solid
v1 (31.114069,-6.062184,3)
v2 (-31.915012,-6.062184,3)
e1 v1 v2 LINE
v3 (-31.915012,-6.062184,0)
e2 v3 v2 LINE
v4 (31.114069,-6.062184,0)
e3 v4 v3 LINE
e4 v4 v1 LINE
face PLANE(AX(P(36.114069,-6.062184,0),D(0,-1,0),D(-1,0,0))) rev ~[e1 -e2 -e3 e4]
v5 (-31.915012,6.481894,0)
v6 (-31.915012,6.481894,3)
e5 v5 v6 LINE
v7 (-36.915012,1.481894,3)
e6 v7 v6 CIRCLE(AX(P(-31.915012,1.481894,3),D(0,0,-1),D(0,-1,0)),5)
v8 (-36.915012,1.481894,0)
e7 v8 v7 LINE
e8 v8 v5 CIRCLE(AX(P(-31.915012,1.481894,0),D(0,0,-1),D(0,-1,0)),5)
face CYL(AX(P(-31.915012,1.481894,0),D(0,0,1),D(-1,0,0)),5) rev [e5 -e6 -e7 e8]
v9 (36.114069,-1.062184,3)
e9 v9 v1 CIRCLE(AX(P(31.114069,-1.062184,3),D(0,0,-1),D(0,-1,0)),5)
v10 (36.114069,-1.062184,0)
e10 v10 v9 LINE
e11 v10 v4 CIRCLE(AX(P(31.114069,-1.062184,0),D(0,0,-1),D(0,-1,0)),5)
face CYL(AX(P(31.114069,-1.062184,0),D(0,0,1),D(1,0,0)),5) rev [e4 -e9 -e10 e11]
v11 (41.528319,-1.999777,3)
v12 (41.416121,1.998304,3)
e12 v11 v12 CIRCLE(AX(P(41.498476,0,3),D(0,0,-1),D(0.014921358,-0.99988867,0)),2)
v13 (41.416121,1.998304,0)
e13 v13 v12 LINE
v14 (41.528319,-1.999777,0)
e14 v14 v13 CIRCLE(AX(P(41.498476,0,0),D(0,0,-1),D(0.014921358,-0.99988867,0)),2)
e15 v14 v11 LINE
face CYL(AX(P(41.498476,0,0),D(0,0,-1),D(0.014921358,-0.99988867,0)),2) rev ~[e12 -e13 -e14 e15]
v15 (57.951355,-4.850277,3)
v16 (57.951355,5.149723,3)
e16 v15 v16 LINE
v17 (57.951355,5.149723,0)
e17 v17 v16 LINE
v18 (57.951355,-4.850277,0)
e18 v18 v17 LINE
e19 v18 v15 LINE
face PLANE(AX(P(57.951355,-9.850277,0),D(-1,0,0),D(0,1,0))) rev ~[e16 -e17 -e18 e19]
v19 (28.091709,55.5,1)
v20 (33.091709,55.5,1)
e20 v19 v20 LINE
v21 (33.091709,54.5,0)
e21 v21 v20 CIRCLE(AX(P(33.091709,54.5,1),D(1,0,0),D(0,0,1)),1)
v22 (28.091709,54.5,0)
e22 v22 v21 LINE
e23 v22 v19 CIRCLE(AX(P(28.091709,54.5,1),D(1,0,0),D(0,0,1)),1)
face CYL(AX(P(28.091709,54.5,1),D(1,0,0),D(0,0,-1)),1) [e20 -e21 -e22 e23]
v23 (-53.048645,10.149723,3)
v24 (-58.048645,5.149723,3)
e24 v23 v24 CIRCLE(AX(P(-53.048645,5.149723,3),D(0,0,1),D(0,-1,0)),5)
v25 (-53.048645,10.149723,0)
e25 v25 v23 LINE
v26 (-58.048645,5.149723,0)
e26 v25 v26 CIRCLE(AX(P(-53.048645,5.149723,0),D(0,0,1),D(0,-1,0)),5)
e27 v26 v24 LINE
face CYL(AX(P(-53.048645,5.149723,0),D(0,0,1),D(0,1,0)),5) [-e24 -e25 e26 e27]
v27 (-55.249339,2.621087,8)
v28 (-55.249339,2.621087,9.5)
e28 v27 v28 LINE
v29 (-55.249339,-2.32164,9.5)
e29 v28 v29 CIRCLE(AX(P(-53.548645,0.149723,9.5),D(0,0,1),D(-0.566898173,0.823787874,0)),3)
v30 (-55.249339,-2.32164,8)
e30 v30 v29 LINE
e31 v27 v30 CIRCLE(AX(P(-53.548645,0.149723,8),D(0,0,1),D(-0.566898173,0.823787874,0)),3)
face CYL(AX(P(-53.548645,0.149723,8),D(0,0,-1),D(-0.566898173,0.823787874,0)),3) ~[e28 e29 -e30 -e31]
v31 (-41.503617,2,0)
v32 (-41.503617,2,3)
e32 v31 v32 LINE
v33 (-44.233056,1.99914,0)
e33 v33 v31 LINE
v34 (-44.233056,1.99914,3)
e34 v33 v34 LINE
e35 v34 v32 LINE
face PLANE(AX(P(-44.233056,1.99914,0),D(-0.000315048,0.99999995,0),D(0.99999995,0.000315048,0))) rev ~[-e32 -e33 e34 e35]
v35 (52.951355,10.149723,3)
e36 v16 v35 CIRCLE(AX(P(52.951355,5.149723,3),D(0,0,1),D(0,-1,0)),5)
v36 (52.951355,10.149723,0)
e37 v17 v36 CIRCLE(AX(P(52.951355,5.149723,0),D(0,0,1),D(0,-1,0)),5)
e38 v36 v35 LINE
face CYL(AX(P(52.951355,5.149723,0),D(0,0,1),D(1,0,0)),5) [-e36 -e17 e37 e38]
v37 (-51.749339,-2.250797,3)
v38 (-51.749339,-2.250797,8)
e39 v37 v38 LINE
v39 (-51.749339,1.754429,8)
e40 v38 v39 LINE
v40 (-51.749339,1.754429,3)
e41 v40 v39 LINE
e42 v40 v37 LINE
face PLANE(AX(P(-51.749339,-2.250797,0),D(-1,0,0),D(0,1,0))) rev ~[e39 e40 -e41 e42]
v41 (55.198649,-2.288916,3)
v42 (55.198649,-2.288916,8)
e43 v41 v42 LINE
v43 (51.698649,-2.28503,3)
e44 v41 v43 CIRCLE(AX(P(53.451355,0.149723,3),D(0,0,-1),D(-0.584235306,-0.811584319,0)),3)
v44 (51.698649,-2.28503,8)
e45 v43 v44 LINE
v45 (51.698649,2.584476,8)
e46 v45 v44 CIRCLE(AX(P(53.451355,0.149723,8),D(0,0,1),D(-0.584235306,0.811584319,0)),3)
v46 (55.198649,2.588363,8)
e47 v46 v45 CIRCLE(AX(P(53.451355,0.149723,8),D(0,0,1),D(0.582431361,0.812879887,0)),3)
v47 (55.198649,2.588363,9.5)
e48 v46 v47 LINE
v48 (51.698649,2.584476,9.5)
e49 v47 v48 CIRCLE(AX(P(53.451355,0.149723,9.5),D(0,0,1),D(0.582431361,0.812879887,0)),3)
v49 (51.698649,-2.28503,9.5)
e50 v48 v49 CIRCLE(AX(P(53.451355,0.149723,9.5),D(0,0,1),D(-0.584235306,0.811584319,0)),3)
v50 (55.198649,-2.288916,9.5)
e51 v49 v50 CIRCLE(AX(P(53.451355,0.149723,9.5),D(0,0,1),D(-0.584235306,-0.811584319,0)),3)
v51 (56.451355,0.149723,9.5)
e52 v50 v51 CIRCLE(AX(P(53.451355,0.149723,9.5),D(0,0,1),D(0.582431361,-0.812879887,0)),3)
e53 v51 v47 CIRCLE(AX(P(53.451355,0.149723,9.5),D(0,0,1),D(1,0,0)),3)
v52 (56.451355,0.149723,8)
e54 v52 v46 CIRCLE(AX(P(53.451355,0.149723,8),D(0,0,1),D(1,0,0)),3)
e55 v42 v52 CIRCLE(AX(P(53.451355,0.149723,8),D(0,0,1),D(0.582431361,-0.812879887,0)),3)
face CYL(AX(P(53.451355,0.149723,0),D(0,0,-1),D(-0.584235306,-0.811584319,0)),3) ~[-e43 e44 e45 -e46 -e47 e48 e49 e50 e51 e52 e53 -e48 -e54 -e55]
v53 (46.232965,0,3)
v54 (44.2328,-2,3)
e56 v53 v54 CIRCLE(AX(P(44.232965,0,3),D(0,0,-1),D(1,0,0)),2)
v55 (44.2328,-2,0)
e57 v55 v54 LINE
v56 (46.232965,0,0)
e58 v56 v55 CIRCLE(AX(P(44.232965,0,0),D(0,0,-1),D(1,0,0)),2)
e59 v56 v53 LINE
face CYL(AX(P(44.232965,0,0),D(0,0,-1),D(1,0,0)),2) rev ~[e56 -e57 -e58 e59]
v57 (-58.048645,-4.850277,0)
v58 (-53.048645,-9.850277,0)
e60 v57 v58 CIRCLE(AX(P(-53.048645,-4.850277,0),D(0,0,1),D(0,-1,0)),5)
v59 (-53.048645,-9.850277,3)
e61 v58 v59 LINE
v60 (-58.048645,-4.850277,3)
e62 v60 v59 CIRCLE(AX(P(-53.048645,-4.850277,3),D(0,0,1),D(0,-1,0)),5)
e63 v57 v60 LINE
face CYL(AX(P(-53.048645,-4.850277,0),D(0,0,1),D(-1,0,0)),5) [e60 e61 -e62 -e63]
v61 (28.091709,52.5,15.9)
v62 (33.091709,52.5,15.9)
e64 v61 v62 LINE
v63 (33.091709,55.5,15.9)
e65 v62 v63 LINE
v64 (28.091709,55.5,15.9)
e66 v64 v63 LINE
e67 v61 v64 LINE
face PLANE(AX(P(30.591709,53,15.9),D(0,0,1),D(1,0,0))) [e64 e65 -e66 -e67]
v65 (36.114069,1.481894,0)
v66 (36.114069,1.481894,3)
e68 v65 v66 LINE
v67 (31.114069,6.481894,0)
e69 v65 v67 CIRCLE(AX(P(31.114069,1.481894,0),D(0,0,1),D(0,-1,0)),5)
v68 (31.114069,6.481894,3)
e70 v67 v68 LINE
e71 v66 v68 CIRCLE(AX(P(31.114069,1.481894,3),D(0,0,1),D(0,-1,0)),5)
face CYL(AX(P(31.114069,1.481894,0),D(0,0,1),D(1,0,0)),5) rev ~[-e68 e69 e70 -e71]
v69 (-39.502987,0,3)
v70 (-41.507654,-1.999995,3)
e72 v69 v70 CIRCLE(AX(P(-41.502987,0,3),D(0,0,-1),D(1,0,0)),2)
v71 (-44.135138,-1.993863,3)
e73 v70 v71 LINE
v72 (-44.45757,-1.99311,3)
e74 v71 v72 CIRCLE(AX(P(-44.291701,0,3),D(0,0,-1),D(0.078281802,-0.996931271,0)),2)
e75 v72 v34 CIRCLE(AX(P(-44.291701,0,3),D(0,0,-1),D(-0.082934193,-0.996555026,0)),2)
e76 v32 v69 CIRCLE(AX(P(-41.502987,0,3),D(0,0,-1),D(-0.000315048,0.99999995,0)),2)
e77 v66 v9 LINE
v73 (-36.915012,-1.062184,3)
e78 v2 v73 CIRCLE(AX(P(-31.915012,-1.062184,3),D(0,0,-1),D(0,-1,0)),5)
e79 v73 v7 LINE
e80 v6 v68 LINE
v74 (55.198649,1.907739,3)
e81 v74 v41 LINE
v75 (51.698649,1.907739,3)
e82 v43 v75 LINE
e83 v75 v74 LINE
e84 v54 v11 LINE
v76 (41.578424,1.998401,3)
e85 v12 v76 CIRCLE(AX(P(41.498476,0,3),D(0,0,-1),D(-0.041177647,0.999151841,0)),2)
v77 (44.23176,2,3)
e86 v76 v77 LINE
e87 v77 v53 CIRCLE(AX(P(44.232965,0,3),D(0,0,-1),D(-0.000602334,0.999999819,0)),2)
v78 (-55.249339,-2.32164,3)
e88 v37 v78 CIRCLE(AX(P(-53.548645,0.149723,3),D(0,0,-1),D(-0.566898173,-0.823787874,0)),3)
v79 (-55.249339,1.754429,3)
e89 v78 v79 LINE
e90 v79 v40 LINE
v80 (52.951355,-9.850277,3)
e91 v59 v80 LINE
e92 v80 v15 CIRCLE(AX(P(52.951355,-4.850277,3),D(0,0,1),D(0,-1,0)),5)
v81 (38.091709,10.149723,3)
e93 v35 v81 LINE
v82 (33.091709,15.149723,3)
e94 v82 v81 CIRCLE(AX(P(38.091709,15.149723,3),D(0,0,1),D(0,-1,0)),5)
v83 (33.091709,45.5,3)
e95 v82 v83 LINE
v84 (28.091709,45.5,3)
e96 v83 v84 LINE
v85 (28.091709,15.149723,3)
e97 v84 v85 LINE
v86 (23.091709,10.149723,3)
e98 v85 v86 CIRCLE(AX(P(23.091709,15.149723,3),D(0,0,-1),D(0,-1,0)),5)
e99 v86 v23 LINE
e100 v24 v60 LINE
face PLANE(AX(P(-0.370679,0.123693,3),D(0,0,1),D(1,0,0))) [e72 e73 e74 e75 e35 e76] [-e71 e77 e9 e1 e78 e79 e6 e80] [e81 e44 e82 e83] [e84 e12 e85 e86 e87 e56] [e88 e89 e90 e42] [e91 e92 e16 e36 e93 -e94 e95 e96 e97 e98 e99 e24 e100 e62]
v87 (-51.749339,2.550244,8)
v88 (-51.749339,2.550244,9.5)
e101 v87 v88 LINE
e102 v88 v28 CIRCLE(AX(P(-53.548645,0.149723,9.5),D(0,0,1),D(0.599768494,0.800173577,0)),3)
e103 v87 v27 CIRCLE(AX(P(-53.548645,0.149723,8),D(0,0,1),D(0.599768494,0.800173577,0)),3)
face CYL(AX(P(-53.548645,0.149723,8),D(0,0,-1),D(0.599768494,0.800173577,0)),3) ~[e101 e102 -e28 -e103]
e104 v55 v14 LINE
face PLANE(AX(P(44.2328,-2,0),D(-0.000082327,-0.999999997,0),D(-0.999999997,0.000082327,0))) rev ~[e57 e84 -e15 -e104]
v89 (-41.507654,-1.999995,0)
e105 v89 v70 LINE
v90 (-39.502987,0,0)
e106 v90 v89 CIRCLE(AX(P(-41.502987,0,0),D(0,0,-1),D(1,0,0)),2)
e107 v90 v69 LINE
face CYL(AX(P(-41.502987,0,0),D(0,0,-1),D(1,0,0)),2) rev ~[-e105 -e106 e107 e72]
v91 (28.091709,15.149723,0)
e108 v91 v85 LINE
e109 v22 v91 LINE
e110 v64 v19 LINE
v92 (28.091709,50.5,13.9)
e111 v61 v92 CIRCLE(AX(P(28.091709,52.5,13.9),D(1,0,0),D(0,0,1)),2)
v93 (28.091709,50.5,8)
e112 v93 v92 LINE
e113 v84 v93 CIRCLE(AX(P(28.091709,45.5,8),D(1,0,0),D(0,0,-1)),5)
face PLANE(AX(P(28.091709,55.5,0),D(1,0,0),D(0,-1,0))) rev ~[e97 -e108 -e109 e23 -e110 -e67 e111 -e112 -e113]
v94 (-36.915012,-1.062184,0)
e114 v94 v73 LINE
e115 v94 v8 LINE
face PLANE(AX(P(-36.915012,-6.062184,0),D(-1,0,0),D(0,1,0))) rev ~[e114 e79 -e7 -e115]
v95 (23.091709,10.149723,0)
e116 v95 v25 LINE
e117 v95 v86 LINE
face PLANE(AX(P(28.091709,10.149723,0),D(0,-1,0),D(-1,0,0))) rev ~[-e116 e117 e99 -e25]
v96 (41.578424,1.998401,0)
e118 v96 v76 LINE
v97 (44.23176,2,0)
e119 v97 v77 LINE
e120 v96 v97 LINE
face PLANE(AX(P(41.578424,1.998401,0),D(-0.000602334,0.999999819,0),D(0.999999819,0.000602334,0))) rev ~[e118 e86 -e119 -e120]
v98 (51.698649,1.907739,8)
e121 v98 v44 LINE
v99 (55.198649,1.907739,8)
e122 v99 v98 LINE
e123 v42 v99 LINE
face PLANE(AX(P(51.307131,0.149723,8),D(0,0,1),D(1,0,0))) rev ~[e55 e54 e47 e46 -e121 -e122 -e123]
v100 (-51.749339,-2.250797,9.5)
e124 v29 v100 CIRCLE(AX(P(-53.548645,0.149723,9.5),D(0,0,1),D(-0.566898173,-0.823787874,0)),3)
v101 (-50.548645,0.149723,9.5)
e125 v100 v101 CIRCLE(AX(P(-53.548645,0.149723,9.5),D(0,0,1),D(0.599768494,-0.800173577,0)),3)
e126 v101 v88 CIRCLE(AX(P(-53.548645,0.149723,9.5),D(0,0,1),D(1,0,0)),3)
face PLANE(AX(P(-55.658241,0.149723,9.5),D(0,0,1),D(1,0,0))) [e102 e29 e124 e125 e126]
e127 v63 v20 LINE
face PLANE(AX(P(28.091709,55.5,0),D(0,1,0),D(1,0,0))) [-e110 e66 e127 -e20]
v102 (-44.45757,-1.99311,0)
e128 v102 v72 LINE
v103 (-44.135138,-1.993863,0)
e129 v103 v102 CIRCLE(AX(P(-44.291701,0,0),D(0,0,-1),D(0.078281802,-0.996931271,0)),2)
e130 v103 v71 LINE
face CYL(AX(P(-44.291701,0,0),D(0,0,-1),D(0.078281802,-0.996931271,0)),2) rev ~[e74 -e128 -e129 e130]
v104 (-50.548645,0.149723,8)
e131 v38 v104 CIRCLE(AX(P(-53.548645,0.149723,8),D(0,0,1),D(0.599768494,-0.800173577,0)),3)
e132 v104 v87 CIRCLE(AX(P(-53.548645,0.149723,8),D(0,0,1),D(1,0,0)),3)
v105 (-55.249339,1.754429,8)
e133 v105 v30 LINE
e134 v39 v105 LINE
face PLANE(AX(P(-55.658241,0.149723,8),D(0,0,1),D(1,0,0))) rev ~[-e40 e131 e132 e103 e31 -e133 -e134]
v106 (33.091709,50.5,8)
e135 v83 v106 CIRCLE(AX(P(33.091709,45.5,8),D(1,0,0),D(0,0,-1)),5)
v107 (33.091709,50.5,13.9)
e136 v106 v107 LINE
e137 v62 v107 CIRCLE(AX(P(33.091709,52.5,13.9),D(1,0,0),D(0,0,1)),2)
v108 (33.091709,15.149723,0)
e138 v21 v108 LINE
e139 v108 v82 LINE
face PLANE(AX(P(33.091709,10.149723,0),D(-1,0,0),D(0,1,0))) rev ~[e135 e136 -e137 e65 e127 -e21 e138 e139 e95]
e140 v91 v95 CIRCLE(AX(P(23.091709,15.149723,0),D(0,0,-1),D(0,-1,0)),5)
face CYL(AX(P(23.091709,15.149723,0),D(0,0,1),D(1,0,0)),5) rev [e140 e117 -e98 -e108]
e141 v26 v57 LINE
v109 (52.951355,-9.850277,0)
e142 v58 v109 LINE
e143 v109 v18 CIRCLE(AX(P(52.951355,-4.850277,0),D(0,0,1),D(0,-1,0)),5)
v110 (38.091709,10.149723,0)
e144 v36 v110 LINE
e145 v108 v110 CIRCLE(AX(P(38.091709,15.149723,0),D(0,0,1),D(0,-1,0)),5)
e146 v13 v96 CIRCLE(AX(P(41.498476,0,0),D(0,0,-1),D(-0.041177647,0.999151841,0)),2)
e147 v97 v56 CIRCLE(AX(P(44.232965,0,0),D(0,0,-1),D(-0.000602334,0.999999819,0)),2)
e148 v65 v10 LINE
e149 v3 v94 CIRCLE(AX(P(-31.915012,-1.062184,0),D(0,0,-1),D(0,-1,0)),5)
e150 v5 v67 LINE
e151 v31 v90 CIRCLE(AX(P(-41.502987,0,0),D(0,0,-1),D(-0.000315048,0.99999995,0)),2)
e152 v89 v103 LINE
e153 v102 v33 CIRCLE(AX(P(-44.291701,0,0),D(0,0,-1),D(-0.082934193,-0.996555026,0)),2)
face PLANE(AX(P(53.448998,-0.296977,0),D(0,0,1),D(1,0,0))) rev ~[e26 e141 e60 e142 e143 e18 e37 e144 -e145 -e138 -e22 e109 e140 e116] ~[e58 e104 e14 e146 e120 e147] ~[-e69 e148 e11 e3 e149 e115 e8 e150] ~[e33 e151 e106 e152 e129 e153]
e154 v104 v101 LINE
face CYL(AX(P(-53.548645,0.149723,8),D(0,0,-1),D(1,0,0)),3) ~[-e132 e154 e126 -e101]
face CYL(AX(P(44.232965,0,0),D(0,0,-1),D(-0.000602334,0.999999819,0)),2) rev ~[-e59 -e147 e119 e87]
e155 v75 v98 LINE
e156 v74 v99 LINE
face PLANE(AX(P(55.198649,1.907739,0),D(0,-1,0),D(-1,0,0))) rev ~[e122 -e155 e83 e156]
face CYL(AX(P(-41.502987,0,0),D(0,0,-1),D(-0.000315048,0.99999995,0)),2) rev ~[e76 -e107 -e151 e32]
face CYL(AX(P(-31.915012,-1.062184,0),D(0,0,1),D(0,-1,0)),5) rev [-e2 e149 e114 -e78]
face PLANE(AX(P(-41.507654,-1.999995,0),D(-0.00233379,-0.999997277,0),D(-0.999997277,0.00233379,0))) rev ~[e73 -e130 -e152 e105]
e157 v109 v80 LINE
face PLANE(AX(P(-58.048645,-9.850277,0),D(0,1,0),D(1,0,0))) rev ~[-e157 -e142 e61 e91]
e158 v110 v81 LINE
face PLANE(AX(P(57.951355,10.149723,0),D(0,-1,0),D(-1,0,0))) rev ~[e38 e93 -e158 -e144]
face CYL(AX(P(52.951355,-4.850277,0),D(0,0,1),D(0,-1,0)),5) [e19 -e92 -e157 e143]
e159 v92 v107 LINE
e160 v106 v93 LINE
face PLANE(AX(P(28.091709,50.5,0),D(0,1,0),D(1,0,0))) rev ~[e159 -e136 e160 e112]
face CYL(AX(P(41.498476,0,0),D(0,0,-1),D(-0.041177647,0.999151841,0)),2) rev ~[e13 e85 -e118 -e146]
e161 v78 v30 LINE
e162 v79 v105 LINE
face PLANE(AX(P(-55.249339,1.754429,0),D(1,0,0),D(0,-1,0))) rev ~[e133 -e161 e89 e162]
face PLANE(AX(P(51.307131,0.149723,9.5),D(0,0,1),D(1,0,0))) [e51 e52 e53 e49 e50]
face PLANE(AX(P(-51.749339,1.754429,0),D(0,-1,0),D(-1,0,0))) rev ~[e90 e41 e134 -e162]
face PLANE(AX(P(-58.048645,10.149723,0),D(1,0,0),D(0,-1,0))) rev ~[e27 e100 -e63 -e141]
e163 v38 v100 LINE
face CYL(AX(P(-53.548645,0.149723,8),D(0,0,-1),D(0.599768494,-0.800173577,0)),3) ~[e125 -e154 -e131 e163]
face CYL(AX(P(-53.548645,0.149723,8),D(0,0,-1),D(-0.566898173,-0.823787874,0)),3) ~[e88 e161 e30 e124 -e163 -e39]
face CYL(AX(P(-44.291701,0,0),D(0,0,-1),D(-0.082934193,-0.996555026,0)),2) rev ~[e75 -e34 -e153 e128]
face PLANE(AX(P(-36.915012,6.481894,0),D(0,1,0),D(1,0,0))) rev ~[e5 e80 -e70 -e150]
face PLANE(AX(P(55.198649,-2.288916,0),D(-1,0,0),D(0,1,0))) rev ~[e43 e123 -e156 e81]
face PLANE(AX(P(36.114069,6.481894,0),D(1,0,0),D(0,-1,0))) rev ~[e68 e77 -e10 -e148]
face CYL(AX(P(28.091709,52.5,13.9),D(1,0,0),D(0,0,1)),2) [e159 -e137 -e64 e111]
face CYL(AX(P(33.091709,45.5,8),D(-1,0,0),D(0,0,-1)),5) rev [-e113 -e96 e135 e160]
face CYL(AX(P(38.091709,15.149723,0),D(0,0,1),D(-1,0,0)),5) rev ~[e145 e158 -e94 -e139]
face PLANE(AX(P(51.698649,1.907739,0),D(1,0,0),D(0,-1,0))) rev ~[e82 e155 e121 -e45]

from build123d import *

# Parameters (mm, degrees)
F0_W     = 5
F0_H     = 40.3502766341
F0_H_2   = 5
F0_H_3   = 3.6678295396
F1_DEPTH = 3
F2_DEPTH = 8
F3_START = 8
F3_DEPTH = 1.5
F4_DEPTH = 15.9
F5_R     = 5
F6_R     = 2
F7_R     = 5
F8_R     = 5
F9_R     = 1


# Not quite as in the source:
# - a feature names something its author has since deleted; it is built from what else it names


with BuildPart() as f1:
    # F0 (on Top) → F1 (new body)
    with BuildSketch(Plane.XY):
        Polygon((28.0917086639, 10.1497233659), (-58.0486447513, 10.1497233659), (-58.0486447513, -9.8502766341), (57.9513552487, -9.8502766341), (57.9513552487, 10.1497233659), (33.0917086639, 10.1497233659), (33.0917086639, 6.4818938263), (36.1140687019, 6.4818938263), (36.1140687019, -6.0621835291), (-36.915011704, -6.0621835291), (-36.915011704, 6.4818938263), (28.0917086639, 6.4818938263), align=None)
        with BuildLine():
            ThreePointArc((-51.749339269, 2.5502440972), (-50.8655573089, 1.4917523434), (-50.5486447513, 0.1497233659))
            ThreePointArc((-50.5486447513, 0.1497233659), (-50.8655573089, -1.1923056116), (-51.749339269, -2.2507973654))
            ThreePointArc((-51.749339269, -2.2507973654), (-53.4879347075, -2.8496622863), (-55.249339269, -2.3216402572))
            ThreePointArc((-55.249339269, -2.3216402572), (-56.5486447513, 0.1497233659), (-55.249339269, 2.621086989))
            ThreePointArc((-55.249339269, 2.621086989), (-53.4879347075, 3.1491090181), (-51.749339269, 2.5502440972))
        make_face(mode=Mode.SUBTRACT)
        with BuildLine():
            ThreePointArc((-44.4575695538, -1.9931100518), (-46.2885460051, 0.1122973538), (-44.233055807, 1.9991399955))
            Line((-44.233055807, 1.9991399955), (-41.5036168453, 1.9999999007))
            ThreePointArc((-41.5036168453, 1.9999999007), (-40.0889959767, 1.4144363176), (-39.5029867487, 0))
            ThreePointArc((-39.5029867487, 0), (-40.090424389, -1.4158628395), (-41.5076543288, -1.9999945534))
            Line((-41.5076543288, -1.9999945534), (-44.1351375643, -1.9938625424))
            ThreePointArc((-44.1351375643, -1.9938625424), (-44.296368748, -1.9999945534), (-44.4575695538, -1.9931100518))
        make_face(mode=Mode.SUBTRACT)
        with BuildLine():
            ThreePointArc((44.2317598479, 1.9999996372), (45.6467520995, 1.4146394126), (46.2329645157, 0))
            ThreePointArc((46.2329645157, 0), (45.6471198627, -1.4142717753), (44.2327998612, -1.9999999932))
            Line((44.2327998612, -1.9999999932), (41.528318721, -1.9997773407))
            ThreePointArc((41.528318721, -1.9997773407), (39.4992630702, -0.0561038438), (41.4161207108, 1.998303682))
            ThreePointArc((41.4161207108, 1.998303682), (41.4972713372, 1.9999996372), (41.5784239479, 1.9984014428))
            Line((41.5784239479, 1.9984014428), (44.2317598479, 1.9999996372))
        make_face(mode=Mode.SUBTRACT)
        with BuildLine():
            ThreePointArc((55.1986493307, 2.5883630259), (56.1198644061, 1.5205110508), (56.4513552487, 0.1497233659))
            ThreePointArc((56.4513552487, 0.1497233659), (56.1198644061, -1.221064319), (55.1986493307, -2.288916294))
            ThreePointArc((55.1986493307, -2.288916294), (53.4480237917, -2.8502747843), (51.6986493307, -2.2850295918))
            ThreePointArc((51.6986493307, -2.2850295918), (50.4513552487, 0.1497233659), (51.6986493307, 2.5844763236))
            ThreePointArc((51.6986493307, 2.5844763236), (53.4480237917, 3.1497215161), (55.1986493307, 2.5883630259))
        make_face(mode=Mode.SUBTRACT)
        with BuildLine():
            Line((-51.749339269, 1.7544291914), (-51.749339269, 2.5502440972))
            ThreePointArc((-51.749339269, 2.5502440972), (-53.4879347075, 3.1491090181), (-55.249339269, 2.621086989))
            Line((-55.249339269, 2.621086989), (-55.249339269, 1.7544291914))
            Line((-55.249339269, 1.7544291914), (-51.749339269, 1.7544291914))
        make_face()
        with BuildLine():
            Line((-55.249339269, 1.7544291914), (-55.249339269, 2.621086989))
            ThreePointArc((-55.249339269, 2.621086989), (-56.5486447513, 0.1497233659), (-55.249339269, -2.3216402572))
            Line((-55.249339269, -2.3216402572), (-55.249339269, 1.7544291914))
        make_face()
        with BuildLine():
            ThreePointArc((-55.249339269, -2.3216402572), (-53.4879347075, -2.8496622863), (-51.749339269, -2.2507973654))
            Line((-51.749339269, -2.2507973654), (-51.749339269, 1.7544291914))
            Line((-51.749339269, 1.7544291914), (-55.249339269, 1.7544291914))
            Line((-55.249339269, 1.7544291914), (-55.249339269, -2.3216402572))
        make_face()
        with BuildLine():
            ThreePointArc((-51.749339269, -2.2507973654), (-50.8655573089, -1.1923056116), (-50.5486447513, 0.1497233659))
            ThreePointArc((-50.5486447513, 0.1497233659), (-50.8655573089, 1.4917523434), (-51.749339269, 2.5502440972))
            Line((-51.749339269, 2.5502440972), (-51.749339269, 1.7544291914))
            Line((-51.749339269, 1.7544291914), (-51.749339269, -2.2507973654))
        make_face()
        with BuildLine():
            Line((55.1986493307, 1.9077386241), (55.1986493307, 2.5883630259))
            ThreePointArc((55.1986493307, 2.5883630259), (53.4480237917, 3.1497215161), (51.6986493307, 2.5844763236))
            Line((51.6986493307, 2.5844763236), (51.6986493307, 1.9077386241))
            Line((51.6986493307, 1.9077386241), (55.1986493307, 1.9077386241))
        make_face()
        with BuildLine():
            Line((51.6986493307, 1.9077386241), (51.6986493307, 2.5844763236))
            ThreePointArc((51.6986493307, 2.5844763236), (50.4513552487, 0.1497233659), (51.6986493307, -2.2850295918))
            Line((51.6986493307, -2.2850295918), (51.6986493307, 1.9077386241))
        make_face()
        with BuildLine():
            ThreePointArc((51.6986493307, -2.2850295918), (53.4480237917, -2.8502747843), (55.1986493307, -2.288916294))
            Line((55.1986493307, -2.288916294), (55.1986493307, 1.9077386241))
            Line((55.1986493307, 1.9077386241), (51.6986493307, 1.9077386241))
            Line((51.6986493307, 1.9077386241), (51.6986493307, -2.2850295918))
        make_face()
        with BuildLine():
            ThreePointArc((55.1986493307, -2.288916294), (56.1198644061, -1.221064319), (56.4513552487, 0.1497233659))
            ThreePointArc((56.4513552487, 0.1497233659), (56.1198644061, 1.5205110508), (55.1986493307, 2.5883630259))
            Line((55.1986493307, 2.5883630259), (55.1986493307, 1.9077386241))
            Line((55.1986493307, 1.9077386241), (55.1986493307, -2.288916294))
        make_face()
        with Locations((30.5917086639, 30.324861683)):
            Rectangle(F0_W, F0_H)
        with Locations((30.5917086639, 53)):
            Rectangle(F0_W, F0_H_2)
        with Locations((30.5917086639, 8.3158085961)):
            Rectangle(F0_W, F0_H_3)
    extrude(amount=F1_DEPTH)

    # F0 (on Top) → F2 (join)
    with BuildSketch(Plane.XY):
        with BuildLine():
            ThreePointArc((51.6986493307, -2.2850295918), (53.4480237917, -2.8502747843), (55.1986493307, -2.288916294))
            Line((55.1986493307, -2.288916294), (55.1986493307, 1.9077386241))
            Line((55.1986493307, 1.9077386241), (51.6986493307, 1.9077386241))
            Line((51.6986493307, 1.9077386241), (51.6986493307, -2.2850295918))
        make_face()
        with BuildLine():
            ThreePointArc((-55.249339269, -2.3216402572), (-53.4879347075, -2.8496622863), (-51.749339269, -2.2507973654))
            Line((-51.749339269, -2.2507973654), (-51.749339269, 1.7544291914))
            Line((-51.749339269, 1.7544291914), (-55.249339269, 1.7544291914))
            Line((-55.249339269, 1.7544291914), (-55.249339269, -2.3216402572))
        make_face()
    extrude(amount=F2_DEPTH)

    # F0 (on Top) → F3 (join)
    with BuildSketch(Plane.XY.offset(F3_START)):
        with BuildLine():
            Line((-55.249339269, 1.7544291914), (-55.249339269, 2.621086989))
            ThreePointArc((-55.249339269, 2.621086989), (-56.5486447513, 0.1497233659), (-55.249339269, -2.3216402572))
            Line((-55.249339269, -2.3216402572), (-55.249339269, 1.7544291914))
        make_face()
        with BuildLine():
            Line((-51.749339269, 1.7544291914), (-51.749339269, 2.5502440972))
            ThreePointArc((-51.749339269, 2.5502440972), (-53.4879347075, 3.1491090181), (-55.249339269, 2.621086989))
            Line((-55.249339269, 2.621086989), (-55.249339269, 1.7544291914))
            Line((-55.249339269, 1.7544291914), (-51.749339269, 1.7544291914))
        make_face()
        with BuildLine():
            ThreePointArc((-55.249339269, -2.3216402572), (-53.4879347075, -2.8496622863), (-51.749339269, -2.2507973654))
            Line((-51.749339269, -2.2507973654), (-51.749339269, 1.7544291914))
            Line((-51.749339269, 1.7544291914), (-55.249339269, 1.7544291914))
            Line((-55.249339269, 1.7544291914), (-55.249339269, -2.3216402572))
        make_face()
        with BuildLine():
            ThreePointArc((-51.749339269, -2.2507973654), (-50.8655573089, -1.1923056116), (-50.5486447513, 0.1497233659))
            ThreePointArc((-50.5486447513, 0.1497233659), (-50.8655573089, 1.4917523434), (-51.749339269, 2.5502440972))
            Line((-51.749339269, 2.5502440972), (-51.749339269, 1.7544291914))
            Line((-51.749339269, 1.7544291914), (-51.749339269, -2.2507973654))
        make_face()
        with BuildLine():
            Line((51.6986493307, 1.9077386241), (51.6986493307, 2.5844763236))
            ThreePointArc((51.6986493307, 2.5844763236), (50.4513552487, 0.1497233659), (51.6986493307, -2.2850295918))
            Line((51.6986493307, -2.2850295918), (51.6986493307, 1.9077386241))
        make_face()
        with BuildLine():
            Line((55.1986493307, 1.9077386241), (55.1986493307, 2.5883630259))
            ThreePointArc((55.1986493307, 2.5883630259), (53.4480237917, 3.1497215161), (51.6986493307, 2.5844763236))
            Line((51.6986493307, 2.5844763236), (51.6986493307, 1.9077386241))
            Line((51.6986493307, 1.9077386241), (55.1986493307, 1.9077386241))
        make_face()
        with BuildLine():
            ThreePointArc((51.6986493307, -2.2850295918), (53.4480237917, -2.8502747843), (55.1986493307, -2.288916294))
            Line((55.1986493307, -2.288916294), (55.1986493307, 1.9077386241))
            Line((55.1986493307, 1.9077386241), (51.6986493307, 1.9077386241))
            Line((51.6986493307, 1.9077386241), (51.6986493307, -2.2850295918))
        make_face()
        with BuildLine():
            ThreePointArc((55.1986493307, -2.288916294), (56.1198644061, -1.221064319), (56.4513552487, 0.1497233659))
            ThreePointArc((56.4513552487, 0.1497233659), (56.1198644061, 1.5205110508), (55.1986493307, 2.5883630259))
            Line((55.1986493307, 2.5883630259), (55.1986493307, 1.9077386241))
            Line((55.1986493307, 1.9077386241), (55.1986493307, -2.288916294))
        make_face()
    extrude(amount=F3_DEPTH)

    # F0 (on Top) → F4 (join)
    with BuildSketch(Plane.XY):
        with Locations((30.5917086639, 53)):
            Rectangle(F0_W, F0_H_2)
    extrude(amount=F4_DEPTH)

    # F5
    f5_edges = [f1.edges().sort_by_distance(p)[0] for p in [
        (-58.048645, -9.850277, 1.5),
        (57.951355, -9.850277, 1.5),
        (57.951355, 10.149723, 1.5),
        (-58.048645, 10.149723, 1.5),
    ]]
    fillet(f5_edges, radius=F5_R)

    # F6
    f6_edges = [f1.edges().sort_by_distance(p)[0] for p in [
        (30.591709, 50.5, 15.9),
    ]]
    fillet(f6_edges, radius=F6_R)

    # F7
    f7_edges = [f1.edges().sort_by_distance(p)[0] for p in [
        (-36.915012, 6.481894, 1.5),
        (-36.915012, -6.062184, 1.5),
        (36.114069, -6.062184, 1.5),
        (36.114069, 6.481894, 1.5),
        (28.091709, 10.149723, 1.5),
        (33.091709, 10.149723, 1.5),
    ]]
    fillet(f7_edges, radius=F7_R)

    # F8
    f8_edges = [f1.edges().sort_by_distance(p)[0] for p in [
        (30.591709, 50.5, 3),
    ]]
    fillet(f8_edges, radius=F8_R)

    # F9
    f9_edges = [f1.edges().sort_by_distance(p)[0] for p in [
        (30.591709, 55.5, 0),
    ]]
    fillet(f9_edges, radius=F9_R)


solid = f1.part
